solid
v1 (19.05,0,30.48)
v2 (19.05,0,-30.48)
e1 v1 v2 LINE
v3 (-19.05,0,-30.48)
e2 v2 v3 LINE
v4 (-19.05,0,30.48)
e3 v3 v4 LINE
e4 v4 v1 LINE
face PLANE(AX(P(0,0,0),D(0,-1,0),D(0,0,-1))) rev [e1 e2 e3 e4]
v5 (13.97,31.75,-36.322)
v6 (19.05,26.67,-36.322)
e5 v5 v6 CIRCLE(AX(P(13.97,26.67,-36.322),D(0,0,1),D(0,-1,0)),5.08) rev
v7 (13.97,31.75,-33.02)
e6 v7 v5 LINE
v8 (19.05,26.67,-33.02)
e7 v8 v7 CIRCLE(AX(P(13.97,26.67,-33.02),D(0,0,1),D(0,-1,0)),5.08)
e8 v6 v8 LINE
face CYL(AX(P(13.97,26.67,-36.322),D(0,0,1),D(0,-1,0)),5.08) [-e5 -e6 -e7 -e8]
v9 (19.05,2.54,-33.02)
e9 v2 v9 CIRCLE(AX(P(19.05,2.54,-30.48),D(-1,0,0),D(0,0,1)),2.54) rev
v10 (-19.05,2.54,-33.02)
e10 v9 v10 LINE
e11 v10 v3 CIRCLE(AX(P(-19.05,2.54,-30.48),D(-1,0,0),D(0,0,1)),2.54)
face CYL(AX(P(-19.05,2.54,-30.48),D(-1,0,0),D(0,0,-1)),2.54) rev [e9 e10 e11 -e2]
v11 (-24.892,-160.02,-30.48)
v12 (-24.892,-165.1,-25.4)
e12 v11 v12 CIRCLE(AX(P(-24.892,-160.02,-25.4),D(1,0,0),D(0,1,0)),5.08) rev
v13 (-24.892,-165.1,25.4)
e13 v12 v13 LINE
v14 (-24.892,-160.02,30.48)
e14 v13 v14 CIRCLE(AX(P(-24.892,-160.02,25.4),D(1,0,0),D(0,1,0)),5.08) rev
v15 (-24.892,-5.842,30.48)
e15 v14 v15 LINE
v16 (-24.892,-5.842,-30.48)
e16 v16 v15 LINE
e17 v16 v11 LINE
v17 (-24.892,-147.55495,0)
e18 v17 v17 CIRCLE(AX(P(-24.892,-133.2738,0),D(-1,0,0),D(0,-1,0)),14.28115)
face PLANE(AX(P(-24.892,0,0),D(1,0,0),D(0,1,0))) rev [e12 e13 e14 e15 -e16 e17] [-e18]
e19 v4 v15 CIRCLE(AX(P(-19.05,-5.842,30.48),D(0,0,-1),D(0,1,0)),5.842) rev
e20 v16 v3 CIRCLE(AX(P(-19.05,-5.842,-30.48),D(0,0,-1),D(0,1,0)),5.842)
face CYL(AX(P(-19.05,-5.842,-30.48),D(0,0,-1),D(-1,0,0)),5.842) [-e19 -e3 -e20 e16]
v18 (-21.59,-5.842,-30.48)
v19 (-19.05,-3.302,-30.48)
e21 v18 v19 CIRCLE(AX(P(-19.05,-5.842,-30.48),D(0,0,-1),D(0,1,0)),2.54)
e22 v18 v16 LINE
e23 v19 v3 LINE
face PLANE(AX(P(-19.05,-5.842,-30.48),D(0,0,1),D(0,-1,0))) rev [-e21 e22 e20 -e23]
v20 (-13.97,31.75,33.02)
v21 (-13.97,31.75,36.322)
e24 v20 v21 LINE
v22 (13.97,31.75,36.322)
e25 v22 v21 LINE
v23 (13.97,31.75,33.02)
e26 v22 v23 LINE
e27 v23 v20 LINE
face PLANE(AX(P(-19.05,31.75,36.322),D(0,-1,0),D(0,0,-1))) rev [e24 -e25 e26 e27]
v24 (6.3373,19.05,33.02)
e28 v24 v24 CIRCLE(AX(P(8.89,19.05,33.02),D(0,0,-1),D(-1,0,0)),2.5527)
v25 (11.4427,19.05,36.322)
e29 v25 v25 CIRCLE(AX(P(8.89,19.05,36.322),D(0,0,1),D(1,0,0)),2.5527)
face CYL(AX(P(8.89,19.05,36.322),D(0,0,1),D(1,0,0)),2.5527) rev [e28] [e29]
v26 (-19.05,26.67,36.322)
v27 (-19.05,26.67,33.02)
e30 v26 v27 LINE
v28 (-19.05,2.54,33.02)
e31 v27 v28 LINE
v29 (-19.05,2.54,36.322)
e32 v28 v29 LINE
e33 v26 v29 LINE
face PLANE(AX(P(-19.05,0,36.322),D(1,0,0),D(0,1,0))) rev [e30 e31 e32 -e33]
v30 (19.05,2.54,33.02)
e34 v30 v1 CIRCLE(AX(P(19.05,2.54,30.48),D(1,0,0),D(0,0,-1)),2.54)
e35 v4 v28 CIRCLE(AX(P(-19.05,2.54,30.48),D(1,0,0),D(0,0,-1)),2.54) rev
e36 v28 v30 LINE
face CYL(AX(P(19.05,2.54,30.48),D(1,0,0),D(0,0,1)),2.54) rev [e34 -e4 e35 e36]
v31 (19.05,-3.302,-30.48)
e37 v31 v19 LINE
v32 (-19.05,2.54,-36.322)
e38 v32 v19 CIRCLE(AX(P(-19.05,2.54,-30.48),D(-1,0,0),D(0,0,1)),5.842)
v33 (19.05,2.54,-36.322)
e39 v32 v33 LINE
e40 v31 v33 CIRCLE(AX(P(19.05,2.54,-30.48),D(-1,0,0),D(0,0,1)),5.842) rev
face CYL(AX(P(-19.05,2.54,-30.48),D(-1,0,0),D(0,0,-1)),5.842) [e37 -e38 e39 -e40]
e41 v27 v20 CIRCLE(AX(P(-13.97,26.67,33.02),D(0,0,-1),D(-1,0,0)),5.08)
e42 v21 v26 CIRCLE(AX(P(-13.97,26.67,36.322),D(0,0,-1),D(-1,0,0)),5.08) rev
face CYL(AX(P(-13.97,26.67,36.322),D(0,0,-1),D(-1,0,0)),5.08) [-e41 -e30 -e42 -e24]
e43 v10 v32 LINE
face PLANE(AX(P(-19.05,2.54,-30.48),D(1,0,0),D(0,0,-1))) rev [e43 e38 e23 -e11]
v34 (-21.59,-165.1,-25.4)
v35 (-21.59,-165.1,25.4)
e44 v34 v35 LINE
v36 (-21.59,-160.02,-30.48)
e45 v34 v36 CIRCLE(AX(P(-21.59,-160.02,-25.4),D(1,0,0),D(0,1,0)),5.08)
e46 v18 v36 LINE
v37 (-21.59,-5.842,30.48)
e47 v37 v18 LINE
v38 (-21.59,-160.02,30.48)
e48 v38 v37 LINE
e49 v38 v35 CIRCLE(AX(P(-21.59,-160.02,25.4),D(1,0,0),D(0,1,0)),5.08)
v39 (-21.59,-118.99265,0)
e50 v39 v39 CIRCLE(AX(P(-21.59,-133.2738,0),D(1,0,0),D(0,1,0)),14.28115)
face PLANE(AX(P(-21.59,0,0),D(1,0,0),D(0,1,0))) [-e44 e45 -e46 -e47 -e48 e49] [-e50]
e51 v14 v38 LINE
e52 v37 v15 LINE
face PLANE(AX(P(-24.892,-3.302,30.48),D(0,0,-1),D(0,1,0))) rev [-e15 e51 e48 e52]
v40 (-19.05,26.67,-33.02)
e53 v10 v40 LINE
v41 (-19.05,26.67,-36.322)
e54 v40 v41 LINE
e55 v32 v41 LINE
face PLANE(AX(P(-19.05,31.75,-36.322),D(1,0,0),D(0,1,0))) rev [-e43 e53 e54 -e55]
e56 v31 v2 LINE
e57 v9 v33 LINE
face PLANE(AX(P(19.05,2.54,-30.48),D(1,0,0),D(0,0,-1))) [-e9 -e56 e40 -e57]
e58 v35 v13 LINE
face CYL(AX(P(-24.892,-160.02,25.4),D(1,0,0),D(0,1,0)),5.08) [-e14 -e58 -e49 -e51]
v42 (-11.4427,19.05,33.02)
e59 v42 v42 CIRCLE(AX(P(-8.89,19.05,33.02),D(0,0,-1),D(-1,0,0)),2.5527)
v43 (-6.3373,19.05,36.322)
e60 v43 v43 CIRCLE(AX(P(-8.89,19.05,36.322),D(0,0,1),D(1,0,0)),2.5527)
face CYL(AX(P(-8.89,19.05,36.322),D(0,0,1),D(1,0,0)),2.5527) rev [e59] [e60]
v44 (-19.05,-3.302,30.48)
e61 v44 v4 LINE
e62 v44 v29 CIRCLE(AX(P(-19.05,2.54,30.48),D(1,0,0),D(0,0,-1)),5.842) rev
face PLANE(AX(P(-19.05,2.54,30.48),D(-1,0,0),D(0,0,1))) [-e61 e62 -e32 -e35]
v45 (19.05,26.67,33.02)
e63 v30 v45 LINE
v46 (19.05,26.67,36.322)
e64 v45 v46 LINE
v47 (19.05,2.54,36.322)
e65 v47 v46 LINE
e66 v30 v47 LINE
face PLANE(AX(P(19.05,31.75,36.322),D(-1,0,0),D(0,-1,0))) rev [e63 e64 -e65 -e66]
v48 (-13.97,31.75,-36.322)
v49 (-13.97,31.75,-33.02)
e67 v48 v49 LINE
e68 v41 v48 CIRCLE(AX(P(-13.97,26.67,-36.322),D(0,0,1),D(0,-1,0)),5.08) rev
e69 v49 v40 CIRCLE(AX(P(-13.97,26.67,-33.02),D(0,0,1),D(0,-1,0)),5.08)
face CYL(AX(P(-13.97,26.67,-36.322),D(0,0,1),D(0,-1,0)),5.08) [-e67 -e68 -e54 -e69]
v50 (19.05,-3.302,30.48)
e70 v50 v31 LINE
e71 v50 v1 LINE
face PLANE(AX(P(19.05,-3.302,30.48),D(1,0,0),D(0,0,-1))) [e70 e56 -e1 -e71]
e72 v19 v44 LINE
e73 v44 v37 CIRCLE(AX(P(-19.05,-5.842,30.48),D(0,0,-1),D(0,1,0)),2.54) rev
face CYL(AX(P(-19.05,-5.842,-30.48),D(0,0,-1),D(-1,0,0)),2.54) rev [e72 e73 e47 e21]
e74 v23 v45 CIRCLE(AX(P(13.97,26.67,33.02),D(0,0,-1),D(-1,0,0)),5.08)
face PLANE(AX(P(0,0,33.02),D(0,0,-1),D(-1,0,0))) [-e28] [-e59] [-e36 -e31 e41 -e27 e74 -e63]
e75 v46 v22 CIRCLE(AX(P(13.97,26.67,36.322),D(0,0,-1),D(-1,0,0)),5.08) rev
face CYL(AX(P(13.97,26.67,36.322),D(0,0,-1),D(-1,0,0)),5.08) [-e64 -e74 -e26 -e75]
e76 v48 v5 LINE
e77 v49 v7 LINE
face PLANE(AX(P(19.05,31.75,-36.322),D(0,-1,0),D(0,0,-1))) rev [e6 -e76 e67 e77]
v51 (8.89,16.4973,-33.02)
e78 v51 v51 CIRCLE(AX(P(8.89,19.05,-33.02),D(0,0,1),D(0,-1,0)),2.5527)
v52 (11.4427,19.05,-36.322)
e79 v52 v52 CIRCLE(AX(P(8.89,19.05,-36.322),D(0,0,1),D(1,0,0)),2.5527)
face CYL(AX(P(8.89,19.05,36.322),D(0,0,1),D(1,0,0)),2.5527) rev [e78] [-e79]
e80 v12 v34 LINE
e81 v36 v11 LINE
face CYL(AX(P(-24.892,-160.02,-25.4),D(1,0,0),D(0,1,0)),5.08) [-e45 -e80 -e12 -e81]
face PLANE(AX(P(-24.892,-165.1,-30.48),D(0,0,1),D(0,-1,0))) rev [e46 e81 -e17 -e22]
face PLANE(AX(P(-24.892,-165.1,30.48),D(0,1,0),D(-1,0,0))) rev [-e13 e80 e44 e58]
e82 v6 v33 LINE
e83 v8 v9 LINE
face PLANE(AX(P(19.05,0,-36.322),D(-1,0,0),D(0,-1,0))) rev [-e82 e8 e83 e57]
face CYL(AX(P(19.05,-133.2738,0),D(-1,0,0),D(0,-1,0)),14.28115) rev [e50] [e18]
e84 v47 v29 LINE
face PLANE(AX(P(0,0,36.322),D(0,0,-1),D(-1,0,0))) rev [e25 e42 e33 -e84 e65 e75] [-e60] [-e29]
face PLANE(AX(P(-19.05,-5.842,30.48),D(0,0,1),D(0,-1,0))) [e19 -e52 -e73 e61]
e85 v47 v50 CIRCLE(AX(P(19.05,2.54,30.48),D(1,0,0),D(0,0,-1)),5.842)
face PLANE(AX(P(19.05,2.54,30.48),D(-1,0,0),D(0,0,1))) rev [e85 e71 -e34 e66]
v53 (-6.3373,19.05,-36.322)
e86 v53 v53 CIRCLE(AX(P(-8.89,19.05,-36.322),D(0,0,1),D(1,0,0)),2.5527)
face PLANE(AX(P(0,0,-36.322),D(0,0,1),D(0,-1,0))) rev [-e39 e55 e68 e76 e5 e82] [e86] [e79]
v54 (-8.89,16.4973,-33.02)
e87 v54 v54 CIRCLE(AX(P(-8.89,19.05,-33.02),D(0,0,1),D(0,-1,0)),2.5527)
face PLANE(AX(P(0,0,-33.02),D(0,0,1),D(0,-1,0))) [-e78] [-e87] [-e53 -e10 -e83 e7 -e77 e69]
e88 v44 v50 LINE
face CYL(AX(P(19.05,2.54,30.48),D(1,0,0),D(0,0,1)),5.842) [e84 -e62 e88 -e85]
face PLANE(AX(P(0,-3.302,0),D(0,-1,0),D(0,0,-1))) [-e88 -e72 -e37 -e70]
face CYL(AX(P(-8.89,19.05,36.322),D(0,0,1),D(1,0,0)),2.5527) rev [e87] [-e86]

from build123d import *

# Parameters (mm, degrees)
SKETCH1_W               = 38.1
SKETCH1_H               = 60.96
BASE_FLANGE1_DEPTH      = 3.302
EDGE_FLANGE1_DEPTH      = 38.1
EDGE_FLANGE1_BEND_DEPTH = 38.1
EDGE_FLANGE2_DEPTH      = 60.96
SKETCH17_R              = 14.28115
CUT_EXTRUDE1_DEPTH      = 175.665958469
F_1_4_20_TAPPED_HOLE1_D = 5.1054
FILLET1_R               = 5.08


# Sheet-metal steps are written as plain solids
with BuildPart() as part:
    # Sketch1 → Base-Flange1 (new body)
    with BuildSketch(Plane(origin=(0, 0, 0), x_dir=(1, 0, 0), z_dir=(0, 1, 0))):
        Rectangle(SKETCH1_W, SKETCH1_H)
    extrude(amount=-BASE_FLANGE1_DEPTH)

    # Edge-Flange1 section (across the edge) → Edge-Flange1 (add)
    with BuildSketch(Plane(origin=(-19.05, 0, 33.02), x_dir=(0, 0, -1), z_dir=(1, 0, 0))):
        with BuildLine():
            Line((-3.302, 2.54), (-3.302, 31.75))
            Line((-3.302, 31.75), (0, 31.75))
            Line((0, 31.75), (0, 2.54))
            ThreePointArc((0, 2.54), (0.743948776, 0.743948776), (2.54, 0))
            Line((2.54, 0), (2.54, -3.302))
            ThreePointArc((2.54, -3.302), (-1.590917816, -1.590917816), (-3.302, 2.54))
        make_face()
    extrude(amount=EDGE_FLANGE1_DEPTH)

    # Edge-Flange1 section 2 (across the edge) → Edge-Flange1 bend (add)
    with BuildSketch(Plane(origin=(19.05, 0, -33.02), x_dir=(0, 0, 1), z_dir=(-1, 0, 0))):
        with BuildLine():
            Line((-3.302, 2.54), (-3.302, 31.75))
            Line((-3.302, 31.75), (0, 31.75))
            Line((0, 31.75), (0, 2.54))
            ThreePointArc((0, 2.54), (0.743948776, 0.743948776), (2.54, 0))
            Line((2.54, 0), (2.54, -3.302))
            ThreePointArc((2.54, -3.302), (-1.590917816, -1.590917816), (-3.302, 2.54))
        make_face()
    extrude(amount=EDGE_FLANGE1_BEND_DEPTH)

    # Edge-Flange2 section (across the edge) → Edge-Flange2 (add)
    with BuildSketch(Plane(origin=(-21.59, -3.302, 30.48), x_dir=(1, 0, 0), z_dir=(0, 0, -1))):
        with BuildLine():
            Line((-3.302, 2.54), (-3.302, 161.798))
            Line((-3.302, 161.798), (0, 161.798))
            Line((0, 161.798), (0, 2.54))
            ThreePointArc((0, 2.54), (0.743948776, 0.743948776), (2.54, 0))
            Line((2.54, 0), (2.54, -3.302))
            ThreePointArc((2.54, -3.302), (-1.590917816, -1.590917816), (-3.302, 2.54))
        make_face()
    extrude(amount=EDGE_FLANGE2_DEPTH)

    # Sketch17 → Cut-Extrude1 (cut, through all)
    with BuildSketch(Plane.ZY.offset(24.892)):
        with Locations(Location((0, -133.2738, 0), (0, 0, 270))):
            Circle(SKETCH17_R)
    extrude(amount=-CUT_EXTRUDE1_DEPTH, mode=Mode.SUBTRACT)

    # 1/4-20 Tapped Hole1 (through all)
    with Locations(Plane.XY.offset(36.322)):
        with Locations((8.89, 19.05), (-8.89, 19.05)):
            Hole(F_1_4_20_TAPPED_HOLE1_D / 2)

    # Fillet1
    fillet1_edges = [part.edges().sort_by_distance(p)[0] for p in [
        (-19.05, 31.75, 34.671),
        (19.05, 31.75, 34.671),
        (19.05, 31.75, -34.671),
        (-19.05, 31.75, -34.671),
        (-23.241, -165.1, 30.48),
        (-23.241, -165.1, -30.48),
    ]]
    fillet(fillet1_edges, radius=FILLET1_R)


solid = part.part
